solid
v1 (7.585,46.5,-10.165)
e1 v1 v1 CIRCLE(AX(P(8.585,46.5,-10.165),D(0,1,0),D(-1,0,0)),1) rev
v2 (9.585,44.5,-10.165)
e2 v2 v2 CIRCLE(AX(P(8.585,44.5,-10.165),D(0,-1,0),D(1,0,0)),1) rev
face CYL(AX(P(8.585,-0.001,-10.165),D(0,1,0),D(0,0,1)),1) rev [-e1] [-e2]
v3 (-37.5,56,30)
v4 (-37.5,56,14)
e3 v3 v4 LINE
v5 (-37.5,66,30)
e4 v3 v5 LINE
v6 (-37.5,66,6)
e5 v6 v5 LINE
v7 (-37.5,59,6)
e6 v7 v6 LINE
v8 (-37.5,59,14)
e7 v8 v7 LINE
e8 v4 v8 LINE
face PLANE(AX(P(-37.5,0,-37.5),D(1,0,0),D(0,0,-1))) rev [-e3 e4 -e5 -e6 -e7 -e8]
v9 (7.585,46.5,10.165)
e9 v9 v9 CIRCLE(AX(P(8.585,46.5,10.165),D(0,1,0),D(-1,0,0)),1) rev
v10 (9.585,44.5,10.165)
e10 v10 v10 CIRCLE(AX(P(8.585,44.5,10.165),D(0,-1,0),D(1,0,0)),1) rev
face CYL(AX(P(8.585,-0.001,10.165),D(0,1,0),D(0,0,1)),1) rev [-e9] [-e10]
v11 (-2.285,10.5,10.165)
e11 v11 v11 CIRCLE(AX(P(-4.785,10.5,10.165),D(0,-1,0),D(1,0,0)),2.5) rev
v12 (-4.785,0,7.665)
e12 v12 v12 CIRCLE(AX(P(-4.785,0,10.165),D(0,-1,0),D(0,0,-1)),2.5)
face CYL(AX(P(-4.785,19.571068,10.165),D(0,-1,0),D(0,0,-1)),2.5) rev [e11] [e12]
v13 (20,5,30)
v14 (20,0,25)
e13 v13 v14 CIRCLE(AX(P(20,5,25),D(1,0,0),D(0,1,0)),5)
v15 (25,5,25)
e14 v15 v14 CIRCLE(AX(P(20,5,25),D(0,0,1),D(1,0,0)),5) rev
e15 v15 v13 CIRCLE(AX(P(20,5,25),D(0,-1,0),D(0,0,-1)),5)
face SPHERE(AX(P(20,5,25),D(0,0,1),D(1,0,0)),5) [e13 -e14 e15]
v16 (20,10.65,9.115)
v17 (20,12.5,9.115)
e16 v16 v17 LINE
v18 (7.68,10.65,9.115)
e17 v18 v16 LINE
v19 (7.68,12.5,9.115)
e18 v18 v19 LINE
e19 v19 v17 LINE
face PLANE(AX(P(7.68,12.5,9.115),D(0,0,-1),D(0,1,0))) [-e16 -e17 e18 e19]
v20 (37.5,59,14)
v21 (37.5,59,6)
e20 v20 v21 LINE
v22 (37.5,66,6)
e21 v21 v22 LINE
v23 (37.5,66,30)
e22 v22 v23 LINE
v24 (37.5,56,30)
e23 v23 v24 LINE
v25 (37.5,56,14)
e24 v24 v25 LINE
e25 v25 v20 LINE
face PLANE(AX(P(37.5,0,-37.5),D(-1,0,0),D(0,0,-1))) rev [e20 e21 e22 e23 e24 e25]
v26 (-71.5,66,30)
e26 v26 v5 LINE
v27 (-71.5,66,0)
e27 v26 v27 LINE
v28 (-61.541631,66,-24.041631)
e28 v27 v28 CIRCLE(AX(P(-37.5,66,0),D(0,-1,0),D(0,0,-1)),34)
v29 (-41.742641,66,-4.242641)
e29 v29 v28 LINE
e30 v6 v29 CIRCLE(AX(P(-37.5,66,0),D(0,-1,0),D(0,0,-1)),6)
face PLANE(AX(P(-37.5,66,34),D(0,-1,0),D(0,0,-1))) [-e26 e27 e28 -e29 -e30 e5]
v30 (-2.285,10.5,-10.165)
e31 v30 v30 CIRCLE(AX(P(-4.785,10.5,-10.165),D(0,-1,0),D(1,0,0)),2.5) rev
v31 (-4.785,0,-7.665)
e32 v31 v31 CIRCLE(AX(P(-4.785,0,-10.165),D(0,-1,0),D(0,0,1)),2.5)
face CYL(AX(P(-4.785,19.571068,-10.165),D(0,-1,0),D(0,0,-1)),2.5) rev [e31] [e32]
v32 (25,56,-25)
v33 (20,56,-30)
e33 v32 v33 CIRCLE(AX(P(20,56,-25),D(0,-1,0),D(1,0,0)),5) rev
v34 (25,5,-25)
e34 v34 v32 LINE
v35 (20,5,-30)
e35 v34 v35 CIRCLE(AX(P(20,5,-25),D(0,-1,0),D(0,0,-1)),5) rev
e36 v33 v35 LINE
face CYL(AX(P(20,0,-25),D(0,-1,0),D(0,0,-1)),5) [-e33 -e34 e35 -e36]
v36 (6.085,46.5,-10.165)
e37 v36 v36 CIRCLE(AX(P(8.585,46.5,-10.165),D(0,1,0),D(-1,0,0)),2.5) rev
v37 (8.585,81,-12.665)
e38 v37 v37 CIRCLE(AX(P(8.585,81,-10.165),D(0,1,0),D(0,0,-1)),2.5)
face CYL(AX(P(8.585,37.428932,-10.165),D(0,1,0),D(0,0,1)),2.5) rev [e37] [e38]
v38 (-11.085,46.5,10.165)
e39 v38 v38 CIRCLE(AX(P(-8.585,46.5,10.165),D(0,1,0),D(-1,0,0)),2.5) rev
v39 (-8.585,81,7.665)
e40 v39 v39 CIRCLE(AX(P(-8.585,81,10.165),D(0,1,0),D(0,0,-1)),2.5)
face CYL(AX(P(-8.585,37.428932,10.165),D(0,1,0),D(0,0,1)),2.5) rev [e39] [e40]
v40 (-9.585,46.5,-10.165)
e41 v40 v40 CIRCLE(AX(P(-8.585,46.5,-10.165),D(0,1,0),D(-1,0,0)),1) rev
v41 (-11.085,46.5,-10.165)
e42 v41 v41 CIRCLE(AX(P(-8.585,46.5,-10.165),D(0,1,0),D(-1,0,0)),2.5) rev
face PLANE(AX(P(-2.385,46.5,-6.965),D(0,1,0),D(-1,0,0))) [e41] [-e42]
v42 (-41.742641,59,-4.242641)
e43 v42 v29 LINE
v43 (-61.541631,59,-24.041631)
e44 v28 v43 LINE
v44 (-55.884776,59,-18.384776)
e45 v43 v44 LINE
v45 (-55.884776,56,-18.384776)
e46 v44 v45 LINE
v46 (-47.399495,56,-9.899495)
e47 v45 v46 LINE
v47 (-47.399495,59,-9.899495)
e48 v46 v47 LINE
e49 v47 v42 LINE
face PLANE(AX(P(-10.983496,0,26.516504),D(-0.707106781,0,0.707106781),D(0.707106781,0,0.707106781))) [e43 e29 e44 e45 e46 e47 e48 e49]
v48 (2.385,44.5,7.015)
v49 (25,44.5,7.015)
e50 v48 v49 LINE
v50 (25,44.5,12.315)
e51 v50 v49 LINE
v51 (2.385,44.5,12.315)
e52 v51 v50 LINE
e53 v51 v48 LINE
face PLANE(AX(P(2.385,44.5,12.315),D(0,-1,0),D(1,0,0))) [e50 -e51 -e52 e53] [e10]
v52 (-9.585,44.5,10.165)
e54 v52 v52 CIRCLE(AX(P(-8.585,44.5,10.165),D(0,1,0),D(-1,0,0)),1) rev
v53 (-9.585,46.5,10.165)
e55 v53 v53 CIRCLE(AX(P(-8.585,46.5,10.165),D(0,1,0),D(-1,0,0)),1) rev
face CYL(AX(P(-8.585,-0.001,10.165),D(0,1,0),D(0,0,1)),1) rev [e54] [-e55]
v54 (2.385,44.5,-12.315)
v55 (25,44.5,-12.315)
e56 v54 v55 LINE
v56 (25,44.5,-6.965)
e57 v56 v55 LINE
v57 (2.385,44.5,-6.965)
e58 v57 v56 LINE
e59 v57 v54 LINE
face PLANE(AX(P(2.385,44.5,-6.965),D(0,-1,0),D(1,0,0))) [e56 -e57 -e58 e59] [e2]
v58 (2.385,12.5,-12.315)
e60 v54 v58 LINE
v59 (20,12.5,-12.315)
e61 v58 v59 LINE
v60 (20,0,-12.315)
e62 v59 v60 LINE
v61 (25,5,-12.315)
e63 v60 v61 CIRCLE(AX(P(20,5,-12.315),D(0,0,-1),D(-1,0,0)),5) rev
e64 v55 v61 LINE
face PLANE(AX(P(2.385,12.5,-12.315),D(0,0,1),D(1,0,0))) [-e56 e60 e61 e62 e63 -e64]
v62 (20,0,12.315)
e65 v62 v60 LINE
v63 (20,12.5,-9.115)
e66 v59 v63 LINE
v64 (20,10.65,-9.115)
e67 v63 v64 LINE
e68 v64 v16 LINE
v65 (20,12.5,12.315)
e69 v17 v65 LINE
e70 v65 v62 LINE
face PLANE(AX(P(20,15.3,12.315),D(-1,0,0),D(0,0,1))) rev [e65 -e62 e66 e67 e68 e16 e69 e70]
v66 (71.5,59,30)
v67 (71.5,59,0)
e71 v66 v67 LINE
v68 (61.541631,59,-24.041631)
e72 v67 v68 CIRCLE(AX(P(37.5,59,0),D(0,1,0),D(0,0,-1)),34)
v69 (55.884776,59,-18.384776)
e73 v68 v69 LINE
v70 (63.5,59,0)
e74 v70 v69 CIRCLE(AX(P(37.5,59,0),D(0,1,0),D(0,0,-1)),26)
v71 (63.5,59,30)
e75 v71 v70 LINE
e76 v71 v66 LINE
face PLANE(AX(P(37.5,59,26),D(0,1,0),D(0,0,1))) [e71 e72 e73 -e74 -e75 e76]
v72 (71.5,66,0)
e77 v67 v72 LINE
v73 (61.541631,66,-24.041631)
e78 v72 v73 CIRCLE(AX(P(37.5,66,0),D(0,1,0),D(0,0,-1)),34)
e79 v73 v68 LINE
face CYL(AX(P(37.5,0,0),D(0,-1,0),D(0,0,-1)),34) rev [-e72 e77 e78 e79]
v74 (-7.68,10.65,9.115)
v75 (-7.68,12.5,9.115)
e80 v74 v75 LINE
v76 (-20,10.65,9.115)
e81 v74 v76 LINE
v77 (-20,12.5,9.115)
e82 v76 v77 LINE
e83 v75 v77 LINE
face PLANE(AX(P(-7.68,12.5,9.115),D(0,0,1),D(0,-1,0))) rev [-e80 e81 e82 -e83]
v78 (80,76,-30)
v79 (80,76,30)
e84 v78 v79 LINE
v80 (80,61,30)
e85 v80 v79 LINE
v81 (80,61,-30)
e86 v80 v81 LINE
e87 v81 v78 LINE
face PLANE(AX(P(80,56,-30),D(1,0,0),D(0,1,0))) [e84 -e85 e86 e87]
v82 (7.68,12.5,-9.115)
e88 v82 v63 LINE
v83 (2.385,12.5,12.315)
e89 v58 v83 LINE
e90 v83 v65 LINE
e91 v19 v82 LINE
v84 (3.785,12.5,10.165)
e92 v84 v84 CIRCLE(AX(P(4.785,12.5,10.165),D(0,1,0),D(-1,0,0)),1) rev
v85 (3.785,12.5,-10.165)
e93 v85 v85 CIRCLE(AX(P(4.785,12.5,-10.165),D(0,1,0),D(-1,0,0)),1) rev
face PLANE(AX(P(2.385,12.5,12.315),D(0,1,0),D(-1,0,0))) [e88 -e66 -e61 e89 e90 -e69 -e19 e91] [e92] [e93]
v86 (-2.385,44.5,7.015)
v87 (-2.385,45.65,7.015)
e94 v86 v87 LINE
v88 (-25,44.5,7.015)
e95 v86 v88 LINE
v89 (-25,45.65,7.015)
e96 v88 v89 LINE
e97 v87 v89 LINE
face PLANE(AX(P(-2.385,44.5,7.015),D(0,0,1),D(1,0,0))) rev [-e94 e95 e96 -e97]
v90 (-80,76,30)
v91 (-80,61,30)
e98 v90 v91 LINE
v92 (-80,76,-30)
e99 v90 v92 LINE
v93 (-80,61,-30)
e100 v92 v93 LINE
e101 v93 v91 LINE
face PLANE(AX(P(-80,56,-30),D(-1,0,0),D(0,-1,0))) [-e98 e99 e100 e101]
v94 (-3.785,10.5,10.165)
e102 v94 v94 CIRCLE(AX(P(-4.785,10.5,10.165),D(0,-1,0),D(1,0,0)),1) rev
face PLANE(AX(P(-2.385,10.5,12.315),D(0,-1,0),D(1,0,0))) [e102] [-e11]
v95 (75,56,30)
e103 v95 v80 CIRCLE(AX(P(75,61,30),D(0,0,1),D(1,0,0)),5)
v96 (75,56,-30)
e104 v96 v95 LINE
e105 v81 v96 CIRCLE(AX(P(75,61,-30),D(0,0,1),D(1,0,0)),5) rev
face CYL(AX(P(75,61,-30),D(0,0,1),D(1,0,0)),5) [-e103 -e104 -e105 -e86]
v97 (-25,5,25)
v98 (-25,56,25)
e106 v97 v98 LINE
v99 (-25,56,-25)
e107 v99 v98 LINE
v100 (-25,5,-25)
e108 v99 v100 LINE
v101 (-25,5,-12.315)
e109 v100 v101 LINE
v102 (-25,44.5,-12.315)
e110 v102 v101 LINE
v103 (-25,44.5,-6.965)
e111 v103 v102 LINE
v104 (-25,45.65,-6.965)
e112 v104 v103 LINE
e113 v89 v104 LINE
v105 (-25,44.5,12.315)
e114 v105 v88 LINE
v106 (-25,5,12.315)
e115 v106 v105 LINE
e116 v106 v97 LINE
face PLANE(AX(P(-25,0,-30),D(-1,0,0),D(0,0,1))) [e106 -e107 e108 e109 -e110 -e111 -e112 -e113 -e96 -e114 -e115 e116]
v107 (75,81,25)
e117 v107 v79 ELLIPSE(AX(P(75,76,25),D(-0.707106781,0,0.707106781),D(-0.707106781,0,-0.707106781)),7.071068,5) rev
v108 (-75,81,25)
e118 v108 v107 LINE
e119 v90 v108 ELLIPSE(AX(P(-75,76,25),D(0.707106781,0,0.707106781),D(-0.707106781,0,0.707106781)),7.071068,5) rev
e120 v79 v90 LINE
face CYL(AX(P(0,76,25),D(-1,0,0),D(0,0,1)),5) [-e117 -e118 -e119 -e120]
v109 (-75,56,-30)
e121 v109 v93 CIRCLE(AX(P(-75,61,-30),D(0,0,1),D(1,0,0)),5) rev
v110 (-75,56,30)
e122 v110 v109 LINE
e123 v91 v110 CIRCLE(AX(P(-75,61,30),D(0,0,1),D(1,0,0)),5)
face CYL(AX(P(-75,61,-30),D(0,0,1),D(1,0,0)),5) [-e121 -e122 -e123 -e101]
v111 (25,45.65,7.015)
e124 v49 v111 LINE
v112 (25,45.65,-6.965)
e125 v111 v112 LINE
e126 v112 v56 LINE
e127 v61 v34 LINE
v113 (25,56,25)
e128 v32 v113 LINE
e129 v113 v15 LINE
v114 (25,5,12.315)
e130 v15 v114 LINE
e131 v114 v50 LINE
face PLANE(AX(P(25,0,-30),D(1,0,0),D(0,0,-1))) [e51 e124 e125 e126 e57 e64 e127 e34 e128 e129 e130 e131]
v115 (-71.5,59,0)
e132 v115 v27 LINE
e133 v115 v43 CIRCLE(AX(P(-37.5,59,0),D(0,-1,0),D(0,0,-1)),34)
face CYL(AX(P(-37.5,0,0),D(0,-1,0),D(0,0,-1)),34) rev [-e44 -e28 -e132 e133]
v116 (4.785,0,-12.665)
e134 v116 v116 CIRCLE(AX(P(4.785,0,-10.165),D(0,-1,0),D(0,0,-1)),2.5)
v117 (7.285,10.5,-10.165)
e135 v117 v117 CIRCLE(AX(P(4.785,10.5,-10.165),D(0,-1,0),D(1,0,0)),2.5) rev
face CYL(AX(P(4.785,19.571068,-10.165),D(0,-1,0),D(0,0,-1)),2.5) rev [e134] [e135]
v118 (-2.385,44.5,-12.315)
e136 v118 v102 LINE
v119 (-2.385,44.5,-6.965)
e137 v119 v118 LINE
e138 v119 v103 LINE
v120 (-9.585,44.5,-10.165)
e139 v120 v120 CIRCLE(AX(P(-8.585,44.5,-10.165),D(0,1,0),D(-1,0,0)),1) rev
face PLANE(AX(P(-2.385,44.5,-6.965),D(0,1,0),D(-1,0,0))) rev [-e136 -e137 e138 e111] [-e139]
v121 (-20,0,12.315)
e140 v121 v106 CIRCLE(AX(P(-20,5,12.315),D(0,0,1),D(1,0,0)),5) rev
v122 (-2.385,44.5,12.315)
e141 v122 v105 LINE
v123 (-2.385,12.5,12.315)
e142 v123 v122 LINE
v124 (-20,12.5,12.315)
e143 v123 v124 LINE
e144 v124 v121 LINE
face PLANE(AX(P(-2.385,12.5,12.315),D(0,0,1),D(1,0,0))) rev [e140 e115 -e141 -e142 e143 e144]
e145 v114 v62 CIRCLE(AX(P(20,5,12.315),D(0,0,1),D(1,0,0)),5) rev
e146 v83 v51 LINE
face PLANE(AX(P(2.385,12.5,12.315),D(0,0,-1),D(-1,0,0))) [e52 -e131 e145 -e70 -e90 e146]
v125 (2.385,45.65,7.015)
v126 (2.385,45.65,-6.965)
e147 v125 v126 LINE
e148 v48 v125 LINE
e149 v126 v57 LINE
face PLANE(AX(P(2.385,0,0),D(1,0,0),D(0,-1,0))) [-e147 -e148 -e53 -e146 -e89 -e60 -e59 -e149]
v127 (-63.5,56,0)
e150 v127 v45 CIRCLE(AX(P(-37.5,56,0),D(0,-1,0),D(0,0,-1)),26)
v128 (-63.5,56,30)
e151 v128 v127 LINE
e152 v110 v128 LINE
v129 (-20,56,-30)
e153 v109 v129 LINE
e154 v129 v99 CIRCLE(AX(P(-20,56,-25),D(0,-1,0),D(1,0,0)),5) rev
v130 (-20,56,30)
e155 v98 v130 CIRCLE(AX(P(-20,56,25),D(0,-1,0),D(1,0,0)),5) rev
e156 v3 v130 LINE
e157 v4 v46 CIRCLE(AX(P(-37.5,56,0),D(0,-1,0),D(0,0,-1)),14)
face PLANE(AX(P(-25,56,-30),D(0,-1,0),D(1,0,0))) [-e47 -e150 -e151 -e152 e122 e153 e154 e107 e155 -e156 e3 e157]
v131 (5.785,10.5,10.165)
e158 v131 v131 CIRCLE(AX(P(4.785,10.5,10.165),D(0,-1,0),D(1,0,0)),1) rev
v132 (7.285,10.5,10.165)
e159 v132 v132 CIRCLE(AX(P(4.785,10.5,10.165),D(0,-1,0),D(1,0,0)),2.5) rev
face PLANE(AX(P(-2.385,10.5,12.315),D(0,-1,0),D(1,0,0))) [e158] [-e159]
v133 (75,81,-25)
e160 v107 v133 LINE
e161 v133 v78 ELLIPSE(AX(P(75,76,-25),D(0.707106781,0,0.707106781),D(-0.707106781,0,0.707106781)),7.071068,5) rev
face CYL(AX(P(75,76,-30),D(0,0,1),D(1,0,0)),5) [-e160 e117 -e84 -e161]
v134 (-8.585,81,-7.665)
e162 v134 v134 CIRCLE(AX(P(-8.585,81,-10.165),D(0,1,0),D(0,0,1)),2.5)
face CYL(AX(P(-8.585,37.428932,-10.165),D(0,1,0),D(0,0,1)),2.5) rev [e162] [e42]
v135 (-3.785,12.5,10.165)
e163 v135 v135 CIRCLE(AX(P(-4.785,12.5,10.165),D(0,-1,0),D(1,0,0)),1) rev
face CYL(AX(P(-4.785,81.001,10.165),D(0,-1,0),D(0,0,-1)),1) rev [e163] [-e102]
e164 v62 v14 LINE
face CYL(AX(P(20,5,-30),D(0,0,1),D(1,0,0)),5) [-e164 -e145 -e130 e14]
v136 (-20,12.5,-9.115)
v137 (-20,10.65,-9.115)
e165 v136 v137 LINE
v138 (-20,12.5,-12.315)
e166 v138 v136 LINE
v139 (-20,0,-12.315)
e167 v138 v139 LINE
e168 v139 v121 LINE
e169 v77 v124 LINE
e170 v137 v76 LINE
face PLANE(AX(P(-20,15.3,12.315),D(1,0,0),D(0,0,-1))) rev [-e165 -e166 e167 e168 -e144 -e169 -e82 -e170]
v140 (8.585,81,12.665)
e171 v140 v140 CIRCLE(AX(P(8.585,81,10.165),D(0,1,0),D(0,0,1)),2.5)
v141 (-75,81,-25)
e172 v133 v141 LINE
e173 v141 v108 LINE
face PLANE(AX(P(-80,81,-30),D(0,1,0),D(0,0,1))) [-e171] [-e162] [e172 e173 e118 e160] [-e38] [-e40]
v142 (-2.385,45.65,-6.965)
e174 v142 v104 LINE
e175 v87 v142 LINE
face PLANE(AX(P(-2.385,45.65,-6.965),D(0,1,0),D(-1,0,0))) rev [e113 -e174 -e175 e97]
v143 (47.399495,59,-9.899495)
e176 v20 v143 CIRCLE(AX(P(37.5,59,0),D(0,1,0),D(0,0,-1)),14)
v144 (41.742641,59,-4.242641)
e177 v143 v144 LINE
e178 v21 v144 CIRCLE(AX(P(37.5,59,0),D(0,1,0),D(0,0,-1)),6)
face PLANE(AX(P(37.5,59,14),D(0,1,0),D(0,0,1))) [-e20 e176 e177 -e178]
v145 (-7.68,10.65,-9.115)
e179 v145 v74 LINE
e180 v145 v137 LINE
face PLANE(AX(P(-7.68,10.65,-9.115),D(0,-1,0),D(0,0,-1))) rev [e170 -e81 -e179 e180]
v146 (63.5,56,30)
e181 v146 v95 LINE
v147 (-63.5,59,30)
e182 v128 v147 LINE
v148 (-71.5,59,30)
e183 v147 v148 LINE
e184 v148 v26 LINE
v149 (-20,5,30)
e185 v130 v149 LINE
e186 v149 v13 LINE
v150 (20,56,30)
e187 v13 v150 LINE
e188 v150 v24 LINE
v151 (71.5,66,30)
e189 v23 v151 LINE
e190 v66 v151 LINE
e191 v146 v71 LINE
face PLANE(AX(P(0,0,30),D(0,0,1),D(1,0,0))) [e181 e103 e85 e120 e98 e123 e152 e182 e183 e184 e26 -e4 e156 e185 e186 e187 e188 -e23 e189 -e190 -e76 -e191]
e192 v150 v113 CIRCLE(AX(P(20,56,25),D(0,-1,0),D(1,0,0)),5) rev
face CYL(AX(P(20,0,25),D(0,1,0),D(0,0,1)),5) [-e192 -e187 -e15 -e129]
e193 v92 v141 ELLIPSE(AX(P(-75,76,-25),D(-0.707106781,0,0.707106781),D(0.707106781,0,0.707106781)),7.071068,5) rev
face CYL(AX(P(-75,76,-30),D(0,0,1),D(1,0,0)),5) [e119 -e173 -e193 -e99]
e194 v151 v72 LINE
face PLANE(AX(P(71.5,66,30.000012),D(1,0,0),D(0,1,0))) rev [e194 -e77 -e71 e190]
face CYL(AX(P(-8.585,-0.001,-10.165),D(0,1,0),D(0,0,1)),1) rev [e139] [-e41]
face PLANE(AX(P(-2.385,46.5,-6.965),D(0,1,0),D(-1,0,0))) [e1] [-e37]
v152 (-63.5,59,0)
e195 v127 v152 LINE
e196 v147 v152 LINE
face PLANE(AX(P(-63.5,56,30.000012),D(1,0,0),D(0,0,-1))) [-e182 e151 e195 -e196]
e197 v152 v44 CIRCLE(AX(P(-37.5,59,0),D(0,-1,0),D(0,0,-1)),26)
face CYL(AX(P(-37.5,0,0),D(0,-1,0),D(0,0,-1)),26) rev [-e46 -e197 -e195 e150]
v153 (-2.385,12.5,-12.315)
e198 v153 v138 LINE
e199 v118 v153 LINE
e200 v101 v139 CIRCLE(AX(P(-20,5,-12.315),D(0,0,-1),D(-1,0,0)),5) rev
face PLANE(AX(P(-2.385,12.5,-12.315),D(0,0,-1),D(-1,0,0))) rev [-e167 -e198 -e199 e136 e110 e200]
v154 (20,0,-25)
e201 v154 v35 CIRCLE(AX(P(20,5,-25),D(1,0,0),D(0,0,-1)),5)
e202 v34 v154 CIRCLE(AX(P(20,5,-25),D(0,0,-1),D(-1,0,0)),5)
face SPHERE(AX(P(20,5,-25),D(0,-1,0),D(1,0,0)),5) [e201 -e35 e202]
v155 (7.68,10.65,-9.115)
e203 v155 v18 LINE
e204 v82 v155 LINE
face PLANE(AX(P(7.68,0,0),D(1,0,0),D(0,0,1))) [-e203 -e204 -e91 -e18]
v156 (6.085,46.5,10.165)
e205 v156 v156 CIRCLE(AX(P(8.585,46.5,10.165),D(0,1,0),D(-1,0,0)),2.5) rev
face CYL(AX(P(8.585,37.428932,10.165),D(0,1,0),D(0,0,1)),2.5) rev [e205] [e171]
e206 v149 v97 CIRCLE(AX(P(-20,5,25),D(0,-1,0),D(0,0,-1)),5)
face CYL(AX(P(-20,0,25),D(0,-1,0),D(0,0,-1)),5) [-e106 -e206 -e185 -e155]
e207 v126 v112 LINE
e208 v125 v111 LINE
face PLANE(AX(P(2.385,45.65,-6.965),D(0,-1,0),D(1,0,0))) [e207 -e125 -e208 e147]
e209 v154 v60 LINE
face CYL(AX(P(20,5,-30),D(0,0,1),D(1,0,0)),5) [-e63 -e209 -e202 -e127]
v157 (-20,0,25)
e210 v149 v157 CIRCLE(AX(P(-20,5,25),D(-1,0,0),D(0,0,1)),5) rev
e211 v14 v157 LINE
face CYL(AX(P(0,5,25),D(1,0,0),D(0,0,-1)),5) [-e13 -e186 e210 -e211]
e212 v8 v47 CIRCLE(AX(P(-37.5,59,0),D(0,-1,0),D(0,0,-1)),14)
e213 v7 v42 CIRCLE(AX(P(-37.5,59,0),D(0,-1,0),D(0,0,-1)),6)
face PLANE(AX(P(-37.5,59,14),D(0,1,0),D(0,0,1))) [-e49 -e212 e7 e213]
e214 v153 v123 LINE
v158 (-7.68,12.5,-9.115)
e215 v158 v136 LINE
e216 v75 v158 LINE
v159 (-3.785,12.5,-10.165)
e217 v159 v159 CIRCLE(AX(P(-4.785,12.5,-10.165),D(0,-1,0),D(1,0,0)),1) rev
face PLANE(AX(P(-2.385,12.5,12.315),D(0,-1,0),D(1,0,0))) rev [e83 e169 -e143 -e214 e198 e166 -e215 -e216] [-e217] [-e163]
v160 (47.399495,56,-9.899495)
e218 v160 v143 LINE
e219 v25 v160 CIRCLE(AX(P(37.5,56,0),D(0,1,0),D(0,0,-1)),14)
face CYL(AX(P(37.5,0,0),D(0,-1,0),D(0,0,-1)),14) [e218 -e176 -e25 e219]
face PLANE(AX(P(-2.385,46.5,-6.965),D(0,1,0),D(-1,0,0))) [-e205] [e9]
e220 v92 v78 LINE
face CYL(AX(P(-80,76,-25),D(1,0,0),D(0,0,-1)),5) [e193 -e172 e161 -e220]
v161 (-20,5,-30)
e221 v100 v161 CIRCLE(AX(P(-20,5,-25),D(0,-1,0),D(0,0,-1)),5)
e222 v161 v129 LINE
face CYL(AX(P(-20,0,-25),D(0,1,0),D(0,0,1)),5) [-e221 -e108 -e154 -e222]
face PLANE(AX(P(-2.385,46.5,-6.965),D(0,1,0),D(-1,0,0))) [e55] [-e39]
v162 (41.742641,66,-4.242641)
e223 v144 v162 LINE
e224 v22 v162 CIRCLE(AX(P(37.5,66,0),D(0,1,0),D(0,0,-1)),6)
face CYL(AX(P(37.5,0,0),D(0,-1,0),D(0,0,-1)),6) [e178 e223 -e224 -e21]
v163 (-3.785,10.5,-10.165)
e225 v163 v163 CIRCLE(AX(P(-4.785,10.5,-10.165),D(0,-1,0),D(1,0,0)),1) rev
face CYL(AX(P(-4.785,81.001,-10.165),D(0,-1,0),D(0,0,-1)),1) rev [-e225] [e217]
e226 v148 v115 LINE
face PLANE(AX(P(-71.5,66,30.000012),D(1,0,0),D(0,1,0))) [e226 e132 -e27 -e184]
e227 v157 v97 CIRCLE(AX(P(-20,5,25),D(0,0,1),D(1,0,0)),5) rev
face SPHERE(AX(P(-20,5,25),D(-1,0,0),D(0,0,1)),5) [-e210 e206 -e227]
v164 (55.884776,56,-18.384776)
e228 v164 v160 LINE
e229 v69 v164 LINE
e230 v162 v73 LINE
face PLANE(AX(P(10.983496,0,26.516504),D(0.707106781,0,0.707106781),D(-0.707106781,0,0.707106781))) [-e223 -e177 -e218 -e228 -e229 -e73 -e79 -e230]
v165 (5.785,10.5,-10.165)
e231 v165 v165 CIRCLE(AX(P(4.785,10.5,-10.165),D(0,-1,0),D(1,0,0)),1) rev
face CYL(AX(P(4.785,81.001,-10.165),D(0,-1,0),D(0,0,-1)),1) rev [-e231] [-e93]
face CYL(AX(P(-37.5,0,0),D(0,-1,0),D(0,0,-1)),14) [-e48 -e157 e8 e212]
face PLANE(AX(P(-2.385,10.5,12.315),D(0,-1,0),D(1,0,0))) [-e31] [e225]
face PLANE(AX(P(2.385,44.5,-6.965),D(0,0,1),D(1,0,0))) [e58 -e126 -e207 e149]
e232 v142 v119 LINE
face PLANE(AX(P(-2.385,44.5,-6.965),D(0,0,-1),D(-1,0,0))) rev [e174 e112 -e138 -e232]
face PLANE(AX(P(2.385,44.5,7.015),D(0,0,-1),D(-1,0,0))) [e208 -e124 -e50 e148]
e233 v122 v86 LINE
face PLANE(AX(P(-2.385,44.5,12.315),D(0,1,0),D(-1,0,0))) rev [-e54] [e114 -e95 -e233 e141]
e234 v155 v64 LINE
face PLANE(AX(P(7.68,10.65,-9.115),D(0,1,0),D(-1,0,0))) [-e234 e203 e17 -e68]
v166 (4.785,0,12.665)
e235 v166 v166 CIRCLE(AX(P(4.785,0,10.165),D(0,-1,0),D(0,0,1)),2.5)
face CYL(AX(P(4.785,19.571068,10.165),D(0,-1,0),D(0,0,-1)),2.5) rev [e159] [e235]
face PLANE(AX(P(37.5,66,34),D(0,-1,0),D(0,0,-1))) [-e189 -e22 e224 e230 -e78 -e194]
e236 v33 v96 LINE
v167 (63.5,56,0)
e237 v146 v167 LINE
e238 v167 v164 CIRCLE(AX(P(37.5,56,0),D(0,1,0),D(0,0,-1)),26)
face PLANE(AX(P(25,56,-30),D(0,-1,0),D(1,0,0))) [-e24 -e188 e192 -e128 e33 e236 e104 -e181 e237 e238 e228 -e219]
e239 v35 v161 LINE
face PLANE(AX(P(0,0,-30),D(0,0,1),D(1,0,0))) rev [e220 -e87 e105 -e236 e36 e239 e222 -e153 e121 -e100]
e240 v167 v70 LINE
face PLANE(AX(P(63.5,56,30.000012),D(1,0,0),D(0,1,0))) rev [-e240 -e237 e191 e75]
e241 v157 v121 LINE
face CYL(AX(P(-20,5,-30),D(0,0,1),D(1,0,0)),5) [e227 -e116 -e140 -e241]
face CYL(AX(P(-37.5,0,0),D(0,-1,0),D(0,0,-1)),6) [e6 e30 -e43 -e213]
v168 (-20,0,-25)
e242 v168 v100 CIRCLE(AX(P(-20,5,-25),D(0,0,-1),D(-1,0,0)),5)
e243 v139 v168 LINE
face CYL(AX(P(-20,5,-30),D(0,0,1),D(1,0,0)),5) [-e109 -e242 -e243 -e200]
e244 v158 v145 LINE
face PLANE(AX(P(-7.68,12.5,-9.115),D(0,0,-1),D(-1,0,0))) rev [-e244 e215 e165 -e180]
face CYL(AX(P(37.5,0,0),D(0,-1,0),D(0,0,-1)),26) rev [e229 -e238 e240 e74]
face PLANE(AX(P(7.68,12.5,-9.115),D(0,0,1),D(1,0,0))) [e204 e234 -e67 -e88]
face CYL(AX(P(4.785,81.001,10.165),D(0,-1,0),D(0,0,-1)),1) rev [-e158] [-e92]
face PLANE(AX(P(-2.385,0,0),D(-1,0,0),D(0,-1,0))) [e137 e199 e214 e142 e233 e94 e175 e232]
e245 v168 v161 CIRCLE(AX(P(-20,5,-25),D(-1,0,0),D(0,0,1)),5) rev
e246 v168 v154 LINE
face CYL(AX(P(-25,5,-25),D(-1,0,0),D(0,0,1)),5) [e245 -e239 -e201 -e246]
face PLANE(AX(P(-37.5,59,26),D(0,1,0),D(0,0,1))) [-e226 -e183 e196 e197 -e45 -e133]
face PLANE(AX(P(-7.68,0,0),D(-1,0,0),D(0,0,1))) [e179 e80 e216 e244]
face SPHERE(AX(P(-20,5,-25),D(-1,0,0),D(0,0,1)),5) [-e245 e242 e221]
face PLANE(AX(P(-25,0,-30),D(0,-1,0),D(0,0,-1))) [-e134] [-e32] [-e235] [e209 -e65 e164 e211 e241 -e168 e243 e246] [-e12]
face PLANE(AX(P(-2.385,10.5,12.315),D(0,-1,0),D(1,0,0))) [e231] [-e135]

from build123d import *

# Parameters (mm, degrees)
BOSS_EXTRUDE1_DEPTH            = 30
BOSS_EXTRUDE1_DEPTH_BACK       = 30
CUT_REVOLVE2_START             = 59
CUT_REVOLVE2_DEPTH             = 7
CUT_REVOLVE2_START_2           = 56
CUT_REVOLVE2_2_DEPTH           = 3
CUT_EXTRUDE1_DEPTH             = 22.615
CUT_EXTRUDE2_REACH             = 130.69
CUT_EXTRUDE2_DIRECTION_2_DEPTH = 129.689548915
FILLET5_R                      = 5
FILLET6_R                      = 5
SKETCH7_W                      = 18.23
SKETCH7_H                      = 1.85
CUT_EXTRUDE3_DEPTH             = 17.32
SKETCH8_W                      = 20
SKETCH8_H                      = 24.63
CUT_EXTRUDE4_DEPTH             = 15.3
CUT_EXTRUDE5_REACH             = 119.733
SKETCH10_R                     = 1
SKETCH12_R                     = 2.5
CUT_EXTRUDE6_DEPTH             = 10.5
CUT_EXTRUDE7_REACH             = 119.733
SKETCH13_R                     = 1
SKETCH14_R                     = 2.5
CUT_EXTRUDE8_DEPTH             = 34.5


# Read off the part's stored shape, not the designer's step: Cut-Revolve2
with BuildPart() as part:
    # Sketch1 → Boss-Extrude1 (new, two sides: drawn at the far end of the back side and taken through both)
    with BuildSketch(Plane.XY.offset(-BOSS_EXTRUDE1_DEPTH_BACK)):
        Polygon((-25, 0), (-25, 56), (-80, 56), (-80, 81), (80, 81), (80, 56), (25, 56), (25, 0), align=None)
    extrude(amount=BOSS_EXTRUDE1_DEPTH + BOSS_EXTRUDE1_DEPTH_BACK)

    # Cut-Revolve2 outline → Cut-Revolve2 (cut)
    with BuildSketch(Plane(origin=(0, 0, 0), x_dir=(1, 0, 0), z_dir=(0, 1, 0)).offset(CUT_REVOLVE2_START)):
        with BuildLine():
            ThreePointArc((-37.5, -6), (-43.043277195, -2.296100594), (-41.742640687, 4.242640687))
            Line((-41.742640687, 4.242640687), (-61.54163056, 24.04163056))
            ThreePointArc((-61.54163056, 24.04163056), (-71.129711609, -5.004247907), (-53.5, -30))
            Line((-53.5, -30), (-37.5, -30))
            Line((-37.5, -30), (-37.5, -6))
        make_face()
    cut_revolve2 = extrude(amount=CUT_REVOLVE2_DEPTH, mode=Mode.SUBTRACT)

    # Cut-Revolve2 2 outline → Cut-Revolve2 2 (cut)
    with BuildSketch(Plane(origin=(0, 0, 0), x_dir=(1, 0, 0), z_dir=(0, 1, 0)).offset(CUT_REVOLVE2_START_2)):
        with BuildLine():
            Line((-37.5, -26), (-37.5, -14))
            ThreePointArc((-37.5, -14), (-50.434313455, -5.357568053), (-47.399494937, 9.899494937))
            Line((-47.399494937, 9.899494937), (-55.884776311, 18.384776311))
            ThreePointArc((-55.884776311, 18.384776311), (-61.520867845, -9.949769241), (-37.5, -26))
        make_face()
    cut_revolve2_2 = extrude(amount=CUT_REVOLVE2_2_DEPTH, mode=Mode.SUBTRACT)

    # Sketch4 → Cut-Extrude1 (cut)
    with BuildSketch(Plane.ZY.offset(25)):
        Polygon((12.315, 12.5), (-12.315, 12.5), (-12.315, 44.5), (-6.965, 44.5), (-6.965, 45.65), (7.015, 45.65), (7.015, 44.5), (12.315, 44.5), align=None)
    cut_extrude1 = extrude(amount=-CUT_EXTRUDE1_DEPTH, mode=Mode.SUBTRACT)

    # Mirror1: Cut-Extrude1 across plane
    add(cut_extrude1.mirror(Plane.ZY), mode=Mode.SUBTRACT)

    # Sketch5 → Cut-Extrude2 (cut, up to next)
    with BuildSketch(Plane.XY.offset(30), mode=Mode.PRIVATE) as cut_extrude2_sk1:
        Polygon((-63.5, 56), (-37.5, 56), (-37.5, 66), (-71.5, 66), (-71.5, 59), (-63.5, 59), align=None)
    cut_extrude2_tool1 = extrude(cut_extrude2_sk1.sketch, amount=-CUT_EXTRUDE2_REACH, mode=Mode.PRIVATE) & part.part
    cut_extrude2 = cut_extrude2_tool1.solids().sort_by_distance((-53.512658, 61.265823, 30))[0]
    add(cut_extrude2, mode=Mode.SUBTRACT)

    # Sketch5 → Cut-Extrude2 direction 2 (cut)
    with BuildSketch(Plane.XY.offset(30)):
        Polygon((-63.5, 56), (-37.5, 56), (-37.5, 66), (-71.5, 66), (-71.5, 59), (-63.5, 59), align=None)
    cut_extrude2_direction_2 = extrude(amount=CUT_EXTRUDE2_DIRECTION_2_DEPTH, mode=Mode.SUBTRACT)

    # Mirror4: Cut-Revolve2, Cut-Revolve2 2 across plane
    add(cut_revolve2.mirror(Plane.ZY), mode=Mode.SUBTRACT)
    add(cut_revolve2_2.mirror(Plane.ZY), mode=Mode.SUBTRACT)

    # Mirror2: Cut-Extrude2, Cut-Extrude2 direction 2 across plane
    add(cut_extrude2.mirror(Plane.ZY), mode=Mode.SUBTRACT)
    add(cut_extrude2_direction_2.mirror(Plane.ZY), mode=Mode.SUBTRACT)

    # Fillet5
    fillet5_edges = [part.edges().sort_by_distance(p)[0] for p in [
        (-80, 81, 0),
        (80, 81, 0),
        (0, 81, -30),
        (0, 81, 30),
    ]]
    fillet(fillet5_edges, radius=FILLET5_R)

    # Fillet6
    fillet6_edges = [part.edges().sort_by_distance(p)[0] for p in [
        (-25, 0, 0),
        (-80, 56, 0),
        (80, 56, 0),
        (25, 0, 0),
        (0, 0, 30),
        (25, 28, 30),
        (-25, 28, 30),
        (-25, 28, -30),
        (0, 0, -30),
        (25, 28, -30),
    ]]
    fillet(fillet6_edges, radius=FILLET6_R)

    # Sketch7 → Cut-Extrude3 (cut)
    with BuildSketch(Plane.ZY.offset(25)):
        with Locations((0, 11.575)):
            Rectangle(SKETCH7_W, SKETCH7_H)
    cut_extrude3 = extrude(amount=-CUT_EXTRUDE3_DEPTH, mode=Mode.SUBTRACT)

    # Mirror5: Cut-Extrude3 across plane
    add(cut_extrude3.mirror(Plane.ZY), mode=Mode.SUBTRACT)

    # Sketch8 → Cut-Extrude4 (cut)
    with BuildSketch(Plane.XZ):
        with Locations((-30, 0)):
            Rectangle(SKETCH8_W, SKETCH8_H)
        with Locations((30, 0)):
            Rectangle(SKETCH8_W, SKETCH8_H)
    extrude(amount=-CUT_EXTRUDE4_DEPTH, mode=Mode.SUBTRACT)

    # Sketch10 → Cut-Extrude5 (cut, up to next)
    with BuildSketch(Plane(origin=(0, 0, 0), x_dir=(-1, 0, 0), z_dir=(0, -1, 0)), mode=Mode.PRIVATE) as cut_extrude5_sk1:
        with Locations(Location((4.785, -10.165, 0), (0, 0, 90))):
            Circle(SKETCH10_R)
    cut_extrude5_tool1 = extrude(cut_extrude5_sk1.sketch, amount=-CUT_EXTRUDE5_REACH, mode=Mode.PRIVATE) & part.part
    # Sketch10 → Cut-Extrude5 (cut, up to next)
    with BuildSketch(Plane(origin=(0, 0, 0), x_dir=(-1, 0, 0), z_dir=(0, -1, 0)), mode=Mode.PRIVATE) as cut_extrude5_sk2:
        with Locations(Location((4.785, 10.165, 0), (0, 0, 180))):
            Circle(SKETCH10_R)
    cut_extrude5_tool2 = extrude(cut_extrude5_sk2.sketch, amount=-CUT_EXTRUDE5_REACH, mode=Mode.PRIVATE) & part.part
    # Sketch10 → Cut-Extrude5 (cut, up to next)
    with BuildSketch(Plane(origin=(0, 0, 0), x_dir=(-1, 0, 0), z_dir=(0, -1, 0)), mode=Mode.PRIVATE) as cut_extrude5_sk3:
        with Locations(Location((-4.785, 10.165, 0), (0, 0, 90))):
            Circle(SKETCH10_R)
    cut_extrude5_tool3 = extrude(cut_extrude5_sk3.sketch, amount=-CUT_EXTRUDE5_REACH, mode=Mode.PRIVATE) & part.part
    # Sketch10 → Cut-Extrude5 (cut, up to next)
    with BuildSketch(Plane(origin=(0, 0, 0), x_dir=(-1, 0, 0), z_dir=(0, -1, 0)), mode=Mode.PRIVATE) as cut_extrude5_sk4:
        with Locations((-4.785, -10.165)):
            Circle(SKETCH10_R)
    cut_extrude5_tool4 = extrude(cut_extrude5_sk4.sketch, amount=-CUT_EXTRUDE5_REACH, mode=Mode.PRIVATE) & part.part
    add(cut_extrude5_tool1.solids().sort_by_distance((-4.785, 0, 10.165))[0], mode=Mode.SUBTRACT)
    add(cut_extrude5_tool2.solids().sort_by_distance((-4.785, 0, -10.165))[0], mode=Mode.SUBTRACT)
    add(cut_extrude5_tool3.solids().sort_by_distance((4.785, 0, -10.165))[0], mode=Mode.SUBTRACT)
    add(cut_extrude5_tool4.solids().sort_by_distance((4.785, 0, 10.165))[0], mode=Mode.SUBTRACT)

    # Sketch12 → Cut-Extrude6 (cut)
    with BuildSketch(Plane.XZ):
        with Locations(Location((-4.785, 10.165, 0), (0, 0, 270))):
            Circle(SKETCH12_R)
        with Locations((-4.785, -10.165)):
            Circle(SKETCH12_R)
        with Locations(Location((4.785, -10.165, 0), (0, 0, 270))):
            Circle(SKETCH12_R)
        with Locations((4.785, 10.165)):
            Circle(SKETCH12_R)
    extrude(amount=-CUT_EXTRUDE6_DEPTH, mode=Mode.SUBTRACT)

    # Sketch13 → Cut-Extrude7 (cut, up to next)
    with BuildSketch(Plane(origin=(0, 81, 0), x_dir=(1, 0, 0), z_dir=(0, 1, 0)), mode=Mode.PRIVATE) as cut_extrude7_sk1:
        with Locations(Location((-8.585, 10.165, 0), (0, 0, 270))):
            Circle(SKETCH13_R)
    cut_extrude7_tool1 = extrude(cut_extrude7_sk1.sketch, amount=-CUT_EXTRUDE7_REACH, mode=Mode.PRIVATE) & part.part
    # Sketch13 → Cut-Extrude7 (cut, up to next)
    with BuildSketch(Plane(origin=(0, 81, 0), x_dir=(1, 0, 0), z_dir=(0, 1, 0)), mode=Mode.PRIVATE) as cut_extrude7_sk2:
        with Locations(Location((-8.585, -10.165, 0), (0, 0, 180))):
            Circle(SKETCH13_R)
    cut_extrude7_tool2 = extrude(cut_extrude7_sk2.sketch, amount=-CUT_EXTRUDE7_REACH, mode=Mode.PRIVATE) & part.part
    # Sketch13 → Cut-Extrude7 (cut, up to next)
    with BuildSketch(Plane(origin=(0, 81, 0), x_dir=(1, 0, 0), z_dir=(0, 1, 0)), mode=Mode.PRIVATE) as cut_extrude7_sk3:
        with Locations(Location((8.585, -10.165, 0), (0, 0, 270))):
            Circle(SKETCH13_R)
    cut_extrude7_tool3 = extrude(cut_extrude7_sk3.sketch, amount=-CUT_EXTRUDE7_REACH, mode=Mode.PRIVATE) & part.part
    # Sketch13 → Cut-Extrude7 (cut, up to next)
    with BuildSketch(Plane(origin=(0, 81, 0), x_dir=(1, 0, 0), z_dir=(0, 1, 0)), mode=Mode.PRIVATE) as cut_extrude7_sk4:
        with Locations((8.585, 10.165)):
            Circle(SKETCH13_R)
    cut_extrude7_tool4 = extrude(cut_extrude7_sk4.sketch, amount=-CUT_EXTRUDE7_REACH, mode=Mode.PRIVATE) & part.part
    add(cut_extrude7_tool1.solids().sort_by_distance((-8.585, 81, -10.165))[0], mode=Mode.SUBTRACT)
    add(cut_extrude7_tool2.solids().sort_by_distance((-8.585, 81, 10.165))[0], mode=Mode.SUBTRACT)
    add(cut_extrude7_tool3.solids().sort_by_distance((8.585, 81, 10.165))[0], mode=Mode.SUBTRACT)
    add(cut_extrude7_tool4.solids().sort_by_distance((8.585, 81, -10.165))[0], mode=Mode.SUBTRACT)

    # Sketch14 → Cut-Extrude8 (cut)
    with BuildSketch(Plane(origin=(0, 81, 0), x_dir=(1, 0, 0), z_dir=(0, 1, 0))):
        with Locations(Location((-8.585, 10.165, 0), (0, 0, 270))):
            Circle(SKETCH14_R)
        with Locations(Location((-8.585, -10.165, 0), (0, 0, 180))):
            Circle(SKETCH14_R)
        with Locations(Location((8.585, -10.165, 0), (0, 0, 270))):
            Circle(SKETCH14_R)
        with Locations(Location((8.585, 10.165, 0), (0, 0, 180))):
            Circle(SKETCH14_R)
    extrude(amount=-CUT_EXTRUDE8_DEPTH, mode=Mode.SUBTRACT)


solid = part.part
